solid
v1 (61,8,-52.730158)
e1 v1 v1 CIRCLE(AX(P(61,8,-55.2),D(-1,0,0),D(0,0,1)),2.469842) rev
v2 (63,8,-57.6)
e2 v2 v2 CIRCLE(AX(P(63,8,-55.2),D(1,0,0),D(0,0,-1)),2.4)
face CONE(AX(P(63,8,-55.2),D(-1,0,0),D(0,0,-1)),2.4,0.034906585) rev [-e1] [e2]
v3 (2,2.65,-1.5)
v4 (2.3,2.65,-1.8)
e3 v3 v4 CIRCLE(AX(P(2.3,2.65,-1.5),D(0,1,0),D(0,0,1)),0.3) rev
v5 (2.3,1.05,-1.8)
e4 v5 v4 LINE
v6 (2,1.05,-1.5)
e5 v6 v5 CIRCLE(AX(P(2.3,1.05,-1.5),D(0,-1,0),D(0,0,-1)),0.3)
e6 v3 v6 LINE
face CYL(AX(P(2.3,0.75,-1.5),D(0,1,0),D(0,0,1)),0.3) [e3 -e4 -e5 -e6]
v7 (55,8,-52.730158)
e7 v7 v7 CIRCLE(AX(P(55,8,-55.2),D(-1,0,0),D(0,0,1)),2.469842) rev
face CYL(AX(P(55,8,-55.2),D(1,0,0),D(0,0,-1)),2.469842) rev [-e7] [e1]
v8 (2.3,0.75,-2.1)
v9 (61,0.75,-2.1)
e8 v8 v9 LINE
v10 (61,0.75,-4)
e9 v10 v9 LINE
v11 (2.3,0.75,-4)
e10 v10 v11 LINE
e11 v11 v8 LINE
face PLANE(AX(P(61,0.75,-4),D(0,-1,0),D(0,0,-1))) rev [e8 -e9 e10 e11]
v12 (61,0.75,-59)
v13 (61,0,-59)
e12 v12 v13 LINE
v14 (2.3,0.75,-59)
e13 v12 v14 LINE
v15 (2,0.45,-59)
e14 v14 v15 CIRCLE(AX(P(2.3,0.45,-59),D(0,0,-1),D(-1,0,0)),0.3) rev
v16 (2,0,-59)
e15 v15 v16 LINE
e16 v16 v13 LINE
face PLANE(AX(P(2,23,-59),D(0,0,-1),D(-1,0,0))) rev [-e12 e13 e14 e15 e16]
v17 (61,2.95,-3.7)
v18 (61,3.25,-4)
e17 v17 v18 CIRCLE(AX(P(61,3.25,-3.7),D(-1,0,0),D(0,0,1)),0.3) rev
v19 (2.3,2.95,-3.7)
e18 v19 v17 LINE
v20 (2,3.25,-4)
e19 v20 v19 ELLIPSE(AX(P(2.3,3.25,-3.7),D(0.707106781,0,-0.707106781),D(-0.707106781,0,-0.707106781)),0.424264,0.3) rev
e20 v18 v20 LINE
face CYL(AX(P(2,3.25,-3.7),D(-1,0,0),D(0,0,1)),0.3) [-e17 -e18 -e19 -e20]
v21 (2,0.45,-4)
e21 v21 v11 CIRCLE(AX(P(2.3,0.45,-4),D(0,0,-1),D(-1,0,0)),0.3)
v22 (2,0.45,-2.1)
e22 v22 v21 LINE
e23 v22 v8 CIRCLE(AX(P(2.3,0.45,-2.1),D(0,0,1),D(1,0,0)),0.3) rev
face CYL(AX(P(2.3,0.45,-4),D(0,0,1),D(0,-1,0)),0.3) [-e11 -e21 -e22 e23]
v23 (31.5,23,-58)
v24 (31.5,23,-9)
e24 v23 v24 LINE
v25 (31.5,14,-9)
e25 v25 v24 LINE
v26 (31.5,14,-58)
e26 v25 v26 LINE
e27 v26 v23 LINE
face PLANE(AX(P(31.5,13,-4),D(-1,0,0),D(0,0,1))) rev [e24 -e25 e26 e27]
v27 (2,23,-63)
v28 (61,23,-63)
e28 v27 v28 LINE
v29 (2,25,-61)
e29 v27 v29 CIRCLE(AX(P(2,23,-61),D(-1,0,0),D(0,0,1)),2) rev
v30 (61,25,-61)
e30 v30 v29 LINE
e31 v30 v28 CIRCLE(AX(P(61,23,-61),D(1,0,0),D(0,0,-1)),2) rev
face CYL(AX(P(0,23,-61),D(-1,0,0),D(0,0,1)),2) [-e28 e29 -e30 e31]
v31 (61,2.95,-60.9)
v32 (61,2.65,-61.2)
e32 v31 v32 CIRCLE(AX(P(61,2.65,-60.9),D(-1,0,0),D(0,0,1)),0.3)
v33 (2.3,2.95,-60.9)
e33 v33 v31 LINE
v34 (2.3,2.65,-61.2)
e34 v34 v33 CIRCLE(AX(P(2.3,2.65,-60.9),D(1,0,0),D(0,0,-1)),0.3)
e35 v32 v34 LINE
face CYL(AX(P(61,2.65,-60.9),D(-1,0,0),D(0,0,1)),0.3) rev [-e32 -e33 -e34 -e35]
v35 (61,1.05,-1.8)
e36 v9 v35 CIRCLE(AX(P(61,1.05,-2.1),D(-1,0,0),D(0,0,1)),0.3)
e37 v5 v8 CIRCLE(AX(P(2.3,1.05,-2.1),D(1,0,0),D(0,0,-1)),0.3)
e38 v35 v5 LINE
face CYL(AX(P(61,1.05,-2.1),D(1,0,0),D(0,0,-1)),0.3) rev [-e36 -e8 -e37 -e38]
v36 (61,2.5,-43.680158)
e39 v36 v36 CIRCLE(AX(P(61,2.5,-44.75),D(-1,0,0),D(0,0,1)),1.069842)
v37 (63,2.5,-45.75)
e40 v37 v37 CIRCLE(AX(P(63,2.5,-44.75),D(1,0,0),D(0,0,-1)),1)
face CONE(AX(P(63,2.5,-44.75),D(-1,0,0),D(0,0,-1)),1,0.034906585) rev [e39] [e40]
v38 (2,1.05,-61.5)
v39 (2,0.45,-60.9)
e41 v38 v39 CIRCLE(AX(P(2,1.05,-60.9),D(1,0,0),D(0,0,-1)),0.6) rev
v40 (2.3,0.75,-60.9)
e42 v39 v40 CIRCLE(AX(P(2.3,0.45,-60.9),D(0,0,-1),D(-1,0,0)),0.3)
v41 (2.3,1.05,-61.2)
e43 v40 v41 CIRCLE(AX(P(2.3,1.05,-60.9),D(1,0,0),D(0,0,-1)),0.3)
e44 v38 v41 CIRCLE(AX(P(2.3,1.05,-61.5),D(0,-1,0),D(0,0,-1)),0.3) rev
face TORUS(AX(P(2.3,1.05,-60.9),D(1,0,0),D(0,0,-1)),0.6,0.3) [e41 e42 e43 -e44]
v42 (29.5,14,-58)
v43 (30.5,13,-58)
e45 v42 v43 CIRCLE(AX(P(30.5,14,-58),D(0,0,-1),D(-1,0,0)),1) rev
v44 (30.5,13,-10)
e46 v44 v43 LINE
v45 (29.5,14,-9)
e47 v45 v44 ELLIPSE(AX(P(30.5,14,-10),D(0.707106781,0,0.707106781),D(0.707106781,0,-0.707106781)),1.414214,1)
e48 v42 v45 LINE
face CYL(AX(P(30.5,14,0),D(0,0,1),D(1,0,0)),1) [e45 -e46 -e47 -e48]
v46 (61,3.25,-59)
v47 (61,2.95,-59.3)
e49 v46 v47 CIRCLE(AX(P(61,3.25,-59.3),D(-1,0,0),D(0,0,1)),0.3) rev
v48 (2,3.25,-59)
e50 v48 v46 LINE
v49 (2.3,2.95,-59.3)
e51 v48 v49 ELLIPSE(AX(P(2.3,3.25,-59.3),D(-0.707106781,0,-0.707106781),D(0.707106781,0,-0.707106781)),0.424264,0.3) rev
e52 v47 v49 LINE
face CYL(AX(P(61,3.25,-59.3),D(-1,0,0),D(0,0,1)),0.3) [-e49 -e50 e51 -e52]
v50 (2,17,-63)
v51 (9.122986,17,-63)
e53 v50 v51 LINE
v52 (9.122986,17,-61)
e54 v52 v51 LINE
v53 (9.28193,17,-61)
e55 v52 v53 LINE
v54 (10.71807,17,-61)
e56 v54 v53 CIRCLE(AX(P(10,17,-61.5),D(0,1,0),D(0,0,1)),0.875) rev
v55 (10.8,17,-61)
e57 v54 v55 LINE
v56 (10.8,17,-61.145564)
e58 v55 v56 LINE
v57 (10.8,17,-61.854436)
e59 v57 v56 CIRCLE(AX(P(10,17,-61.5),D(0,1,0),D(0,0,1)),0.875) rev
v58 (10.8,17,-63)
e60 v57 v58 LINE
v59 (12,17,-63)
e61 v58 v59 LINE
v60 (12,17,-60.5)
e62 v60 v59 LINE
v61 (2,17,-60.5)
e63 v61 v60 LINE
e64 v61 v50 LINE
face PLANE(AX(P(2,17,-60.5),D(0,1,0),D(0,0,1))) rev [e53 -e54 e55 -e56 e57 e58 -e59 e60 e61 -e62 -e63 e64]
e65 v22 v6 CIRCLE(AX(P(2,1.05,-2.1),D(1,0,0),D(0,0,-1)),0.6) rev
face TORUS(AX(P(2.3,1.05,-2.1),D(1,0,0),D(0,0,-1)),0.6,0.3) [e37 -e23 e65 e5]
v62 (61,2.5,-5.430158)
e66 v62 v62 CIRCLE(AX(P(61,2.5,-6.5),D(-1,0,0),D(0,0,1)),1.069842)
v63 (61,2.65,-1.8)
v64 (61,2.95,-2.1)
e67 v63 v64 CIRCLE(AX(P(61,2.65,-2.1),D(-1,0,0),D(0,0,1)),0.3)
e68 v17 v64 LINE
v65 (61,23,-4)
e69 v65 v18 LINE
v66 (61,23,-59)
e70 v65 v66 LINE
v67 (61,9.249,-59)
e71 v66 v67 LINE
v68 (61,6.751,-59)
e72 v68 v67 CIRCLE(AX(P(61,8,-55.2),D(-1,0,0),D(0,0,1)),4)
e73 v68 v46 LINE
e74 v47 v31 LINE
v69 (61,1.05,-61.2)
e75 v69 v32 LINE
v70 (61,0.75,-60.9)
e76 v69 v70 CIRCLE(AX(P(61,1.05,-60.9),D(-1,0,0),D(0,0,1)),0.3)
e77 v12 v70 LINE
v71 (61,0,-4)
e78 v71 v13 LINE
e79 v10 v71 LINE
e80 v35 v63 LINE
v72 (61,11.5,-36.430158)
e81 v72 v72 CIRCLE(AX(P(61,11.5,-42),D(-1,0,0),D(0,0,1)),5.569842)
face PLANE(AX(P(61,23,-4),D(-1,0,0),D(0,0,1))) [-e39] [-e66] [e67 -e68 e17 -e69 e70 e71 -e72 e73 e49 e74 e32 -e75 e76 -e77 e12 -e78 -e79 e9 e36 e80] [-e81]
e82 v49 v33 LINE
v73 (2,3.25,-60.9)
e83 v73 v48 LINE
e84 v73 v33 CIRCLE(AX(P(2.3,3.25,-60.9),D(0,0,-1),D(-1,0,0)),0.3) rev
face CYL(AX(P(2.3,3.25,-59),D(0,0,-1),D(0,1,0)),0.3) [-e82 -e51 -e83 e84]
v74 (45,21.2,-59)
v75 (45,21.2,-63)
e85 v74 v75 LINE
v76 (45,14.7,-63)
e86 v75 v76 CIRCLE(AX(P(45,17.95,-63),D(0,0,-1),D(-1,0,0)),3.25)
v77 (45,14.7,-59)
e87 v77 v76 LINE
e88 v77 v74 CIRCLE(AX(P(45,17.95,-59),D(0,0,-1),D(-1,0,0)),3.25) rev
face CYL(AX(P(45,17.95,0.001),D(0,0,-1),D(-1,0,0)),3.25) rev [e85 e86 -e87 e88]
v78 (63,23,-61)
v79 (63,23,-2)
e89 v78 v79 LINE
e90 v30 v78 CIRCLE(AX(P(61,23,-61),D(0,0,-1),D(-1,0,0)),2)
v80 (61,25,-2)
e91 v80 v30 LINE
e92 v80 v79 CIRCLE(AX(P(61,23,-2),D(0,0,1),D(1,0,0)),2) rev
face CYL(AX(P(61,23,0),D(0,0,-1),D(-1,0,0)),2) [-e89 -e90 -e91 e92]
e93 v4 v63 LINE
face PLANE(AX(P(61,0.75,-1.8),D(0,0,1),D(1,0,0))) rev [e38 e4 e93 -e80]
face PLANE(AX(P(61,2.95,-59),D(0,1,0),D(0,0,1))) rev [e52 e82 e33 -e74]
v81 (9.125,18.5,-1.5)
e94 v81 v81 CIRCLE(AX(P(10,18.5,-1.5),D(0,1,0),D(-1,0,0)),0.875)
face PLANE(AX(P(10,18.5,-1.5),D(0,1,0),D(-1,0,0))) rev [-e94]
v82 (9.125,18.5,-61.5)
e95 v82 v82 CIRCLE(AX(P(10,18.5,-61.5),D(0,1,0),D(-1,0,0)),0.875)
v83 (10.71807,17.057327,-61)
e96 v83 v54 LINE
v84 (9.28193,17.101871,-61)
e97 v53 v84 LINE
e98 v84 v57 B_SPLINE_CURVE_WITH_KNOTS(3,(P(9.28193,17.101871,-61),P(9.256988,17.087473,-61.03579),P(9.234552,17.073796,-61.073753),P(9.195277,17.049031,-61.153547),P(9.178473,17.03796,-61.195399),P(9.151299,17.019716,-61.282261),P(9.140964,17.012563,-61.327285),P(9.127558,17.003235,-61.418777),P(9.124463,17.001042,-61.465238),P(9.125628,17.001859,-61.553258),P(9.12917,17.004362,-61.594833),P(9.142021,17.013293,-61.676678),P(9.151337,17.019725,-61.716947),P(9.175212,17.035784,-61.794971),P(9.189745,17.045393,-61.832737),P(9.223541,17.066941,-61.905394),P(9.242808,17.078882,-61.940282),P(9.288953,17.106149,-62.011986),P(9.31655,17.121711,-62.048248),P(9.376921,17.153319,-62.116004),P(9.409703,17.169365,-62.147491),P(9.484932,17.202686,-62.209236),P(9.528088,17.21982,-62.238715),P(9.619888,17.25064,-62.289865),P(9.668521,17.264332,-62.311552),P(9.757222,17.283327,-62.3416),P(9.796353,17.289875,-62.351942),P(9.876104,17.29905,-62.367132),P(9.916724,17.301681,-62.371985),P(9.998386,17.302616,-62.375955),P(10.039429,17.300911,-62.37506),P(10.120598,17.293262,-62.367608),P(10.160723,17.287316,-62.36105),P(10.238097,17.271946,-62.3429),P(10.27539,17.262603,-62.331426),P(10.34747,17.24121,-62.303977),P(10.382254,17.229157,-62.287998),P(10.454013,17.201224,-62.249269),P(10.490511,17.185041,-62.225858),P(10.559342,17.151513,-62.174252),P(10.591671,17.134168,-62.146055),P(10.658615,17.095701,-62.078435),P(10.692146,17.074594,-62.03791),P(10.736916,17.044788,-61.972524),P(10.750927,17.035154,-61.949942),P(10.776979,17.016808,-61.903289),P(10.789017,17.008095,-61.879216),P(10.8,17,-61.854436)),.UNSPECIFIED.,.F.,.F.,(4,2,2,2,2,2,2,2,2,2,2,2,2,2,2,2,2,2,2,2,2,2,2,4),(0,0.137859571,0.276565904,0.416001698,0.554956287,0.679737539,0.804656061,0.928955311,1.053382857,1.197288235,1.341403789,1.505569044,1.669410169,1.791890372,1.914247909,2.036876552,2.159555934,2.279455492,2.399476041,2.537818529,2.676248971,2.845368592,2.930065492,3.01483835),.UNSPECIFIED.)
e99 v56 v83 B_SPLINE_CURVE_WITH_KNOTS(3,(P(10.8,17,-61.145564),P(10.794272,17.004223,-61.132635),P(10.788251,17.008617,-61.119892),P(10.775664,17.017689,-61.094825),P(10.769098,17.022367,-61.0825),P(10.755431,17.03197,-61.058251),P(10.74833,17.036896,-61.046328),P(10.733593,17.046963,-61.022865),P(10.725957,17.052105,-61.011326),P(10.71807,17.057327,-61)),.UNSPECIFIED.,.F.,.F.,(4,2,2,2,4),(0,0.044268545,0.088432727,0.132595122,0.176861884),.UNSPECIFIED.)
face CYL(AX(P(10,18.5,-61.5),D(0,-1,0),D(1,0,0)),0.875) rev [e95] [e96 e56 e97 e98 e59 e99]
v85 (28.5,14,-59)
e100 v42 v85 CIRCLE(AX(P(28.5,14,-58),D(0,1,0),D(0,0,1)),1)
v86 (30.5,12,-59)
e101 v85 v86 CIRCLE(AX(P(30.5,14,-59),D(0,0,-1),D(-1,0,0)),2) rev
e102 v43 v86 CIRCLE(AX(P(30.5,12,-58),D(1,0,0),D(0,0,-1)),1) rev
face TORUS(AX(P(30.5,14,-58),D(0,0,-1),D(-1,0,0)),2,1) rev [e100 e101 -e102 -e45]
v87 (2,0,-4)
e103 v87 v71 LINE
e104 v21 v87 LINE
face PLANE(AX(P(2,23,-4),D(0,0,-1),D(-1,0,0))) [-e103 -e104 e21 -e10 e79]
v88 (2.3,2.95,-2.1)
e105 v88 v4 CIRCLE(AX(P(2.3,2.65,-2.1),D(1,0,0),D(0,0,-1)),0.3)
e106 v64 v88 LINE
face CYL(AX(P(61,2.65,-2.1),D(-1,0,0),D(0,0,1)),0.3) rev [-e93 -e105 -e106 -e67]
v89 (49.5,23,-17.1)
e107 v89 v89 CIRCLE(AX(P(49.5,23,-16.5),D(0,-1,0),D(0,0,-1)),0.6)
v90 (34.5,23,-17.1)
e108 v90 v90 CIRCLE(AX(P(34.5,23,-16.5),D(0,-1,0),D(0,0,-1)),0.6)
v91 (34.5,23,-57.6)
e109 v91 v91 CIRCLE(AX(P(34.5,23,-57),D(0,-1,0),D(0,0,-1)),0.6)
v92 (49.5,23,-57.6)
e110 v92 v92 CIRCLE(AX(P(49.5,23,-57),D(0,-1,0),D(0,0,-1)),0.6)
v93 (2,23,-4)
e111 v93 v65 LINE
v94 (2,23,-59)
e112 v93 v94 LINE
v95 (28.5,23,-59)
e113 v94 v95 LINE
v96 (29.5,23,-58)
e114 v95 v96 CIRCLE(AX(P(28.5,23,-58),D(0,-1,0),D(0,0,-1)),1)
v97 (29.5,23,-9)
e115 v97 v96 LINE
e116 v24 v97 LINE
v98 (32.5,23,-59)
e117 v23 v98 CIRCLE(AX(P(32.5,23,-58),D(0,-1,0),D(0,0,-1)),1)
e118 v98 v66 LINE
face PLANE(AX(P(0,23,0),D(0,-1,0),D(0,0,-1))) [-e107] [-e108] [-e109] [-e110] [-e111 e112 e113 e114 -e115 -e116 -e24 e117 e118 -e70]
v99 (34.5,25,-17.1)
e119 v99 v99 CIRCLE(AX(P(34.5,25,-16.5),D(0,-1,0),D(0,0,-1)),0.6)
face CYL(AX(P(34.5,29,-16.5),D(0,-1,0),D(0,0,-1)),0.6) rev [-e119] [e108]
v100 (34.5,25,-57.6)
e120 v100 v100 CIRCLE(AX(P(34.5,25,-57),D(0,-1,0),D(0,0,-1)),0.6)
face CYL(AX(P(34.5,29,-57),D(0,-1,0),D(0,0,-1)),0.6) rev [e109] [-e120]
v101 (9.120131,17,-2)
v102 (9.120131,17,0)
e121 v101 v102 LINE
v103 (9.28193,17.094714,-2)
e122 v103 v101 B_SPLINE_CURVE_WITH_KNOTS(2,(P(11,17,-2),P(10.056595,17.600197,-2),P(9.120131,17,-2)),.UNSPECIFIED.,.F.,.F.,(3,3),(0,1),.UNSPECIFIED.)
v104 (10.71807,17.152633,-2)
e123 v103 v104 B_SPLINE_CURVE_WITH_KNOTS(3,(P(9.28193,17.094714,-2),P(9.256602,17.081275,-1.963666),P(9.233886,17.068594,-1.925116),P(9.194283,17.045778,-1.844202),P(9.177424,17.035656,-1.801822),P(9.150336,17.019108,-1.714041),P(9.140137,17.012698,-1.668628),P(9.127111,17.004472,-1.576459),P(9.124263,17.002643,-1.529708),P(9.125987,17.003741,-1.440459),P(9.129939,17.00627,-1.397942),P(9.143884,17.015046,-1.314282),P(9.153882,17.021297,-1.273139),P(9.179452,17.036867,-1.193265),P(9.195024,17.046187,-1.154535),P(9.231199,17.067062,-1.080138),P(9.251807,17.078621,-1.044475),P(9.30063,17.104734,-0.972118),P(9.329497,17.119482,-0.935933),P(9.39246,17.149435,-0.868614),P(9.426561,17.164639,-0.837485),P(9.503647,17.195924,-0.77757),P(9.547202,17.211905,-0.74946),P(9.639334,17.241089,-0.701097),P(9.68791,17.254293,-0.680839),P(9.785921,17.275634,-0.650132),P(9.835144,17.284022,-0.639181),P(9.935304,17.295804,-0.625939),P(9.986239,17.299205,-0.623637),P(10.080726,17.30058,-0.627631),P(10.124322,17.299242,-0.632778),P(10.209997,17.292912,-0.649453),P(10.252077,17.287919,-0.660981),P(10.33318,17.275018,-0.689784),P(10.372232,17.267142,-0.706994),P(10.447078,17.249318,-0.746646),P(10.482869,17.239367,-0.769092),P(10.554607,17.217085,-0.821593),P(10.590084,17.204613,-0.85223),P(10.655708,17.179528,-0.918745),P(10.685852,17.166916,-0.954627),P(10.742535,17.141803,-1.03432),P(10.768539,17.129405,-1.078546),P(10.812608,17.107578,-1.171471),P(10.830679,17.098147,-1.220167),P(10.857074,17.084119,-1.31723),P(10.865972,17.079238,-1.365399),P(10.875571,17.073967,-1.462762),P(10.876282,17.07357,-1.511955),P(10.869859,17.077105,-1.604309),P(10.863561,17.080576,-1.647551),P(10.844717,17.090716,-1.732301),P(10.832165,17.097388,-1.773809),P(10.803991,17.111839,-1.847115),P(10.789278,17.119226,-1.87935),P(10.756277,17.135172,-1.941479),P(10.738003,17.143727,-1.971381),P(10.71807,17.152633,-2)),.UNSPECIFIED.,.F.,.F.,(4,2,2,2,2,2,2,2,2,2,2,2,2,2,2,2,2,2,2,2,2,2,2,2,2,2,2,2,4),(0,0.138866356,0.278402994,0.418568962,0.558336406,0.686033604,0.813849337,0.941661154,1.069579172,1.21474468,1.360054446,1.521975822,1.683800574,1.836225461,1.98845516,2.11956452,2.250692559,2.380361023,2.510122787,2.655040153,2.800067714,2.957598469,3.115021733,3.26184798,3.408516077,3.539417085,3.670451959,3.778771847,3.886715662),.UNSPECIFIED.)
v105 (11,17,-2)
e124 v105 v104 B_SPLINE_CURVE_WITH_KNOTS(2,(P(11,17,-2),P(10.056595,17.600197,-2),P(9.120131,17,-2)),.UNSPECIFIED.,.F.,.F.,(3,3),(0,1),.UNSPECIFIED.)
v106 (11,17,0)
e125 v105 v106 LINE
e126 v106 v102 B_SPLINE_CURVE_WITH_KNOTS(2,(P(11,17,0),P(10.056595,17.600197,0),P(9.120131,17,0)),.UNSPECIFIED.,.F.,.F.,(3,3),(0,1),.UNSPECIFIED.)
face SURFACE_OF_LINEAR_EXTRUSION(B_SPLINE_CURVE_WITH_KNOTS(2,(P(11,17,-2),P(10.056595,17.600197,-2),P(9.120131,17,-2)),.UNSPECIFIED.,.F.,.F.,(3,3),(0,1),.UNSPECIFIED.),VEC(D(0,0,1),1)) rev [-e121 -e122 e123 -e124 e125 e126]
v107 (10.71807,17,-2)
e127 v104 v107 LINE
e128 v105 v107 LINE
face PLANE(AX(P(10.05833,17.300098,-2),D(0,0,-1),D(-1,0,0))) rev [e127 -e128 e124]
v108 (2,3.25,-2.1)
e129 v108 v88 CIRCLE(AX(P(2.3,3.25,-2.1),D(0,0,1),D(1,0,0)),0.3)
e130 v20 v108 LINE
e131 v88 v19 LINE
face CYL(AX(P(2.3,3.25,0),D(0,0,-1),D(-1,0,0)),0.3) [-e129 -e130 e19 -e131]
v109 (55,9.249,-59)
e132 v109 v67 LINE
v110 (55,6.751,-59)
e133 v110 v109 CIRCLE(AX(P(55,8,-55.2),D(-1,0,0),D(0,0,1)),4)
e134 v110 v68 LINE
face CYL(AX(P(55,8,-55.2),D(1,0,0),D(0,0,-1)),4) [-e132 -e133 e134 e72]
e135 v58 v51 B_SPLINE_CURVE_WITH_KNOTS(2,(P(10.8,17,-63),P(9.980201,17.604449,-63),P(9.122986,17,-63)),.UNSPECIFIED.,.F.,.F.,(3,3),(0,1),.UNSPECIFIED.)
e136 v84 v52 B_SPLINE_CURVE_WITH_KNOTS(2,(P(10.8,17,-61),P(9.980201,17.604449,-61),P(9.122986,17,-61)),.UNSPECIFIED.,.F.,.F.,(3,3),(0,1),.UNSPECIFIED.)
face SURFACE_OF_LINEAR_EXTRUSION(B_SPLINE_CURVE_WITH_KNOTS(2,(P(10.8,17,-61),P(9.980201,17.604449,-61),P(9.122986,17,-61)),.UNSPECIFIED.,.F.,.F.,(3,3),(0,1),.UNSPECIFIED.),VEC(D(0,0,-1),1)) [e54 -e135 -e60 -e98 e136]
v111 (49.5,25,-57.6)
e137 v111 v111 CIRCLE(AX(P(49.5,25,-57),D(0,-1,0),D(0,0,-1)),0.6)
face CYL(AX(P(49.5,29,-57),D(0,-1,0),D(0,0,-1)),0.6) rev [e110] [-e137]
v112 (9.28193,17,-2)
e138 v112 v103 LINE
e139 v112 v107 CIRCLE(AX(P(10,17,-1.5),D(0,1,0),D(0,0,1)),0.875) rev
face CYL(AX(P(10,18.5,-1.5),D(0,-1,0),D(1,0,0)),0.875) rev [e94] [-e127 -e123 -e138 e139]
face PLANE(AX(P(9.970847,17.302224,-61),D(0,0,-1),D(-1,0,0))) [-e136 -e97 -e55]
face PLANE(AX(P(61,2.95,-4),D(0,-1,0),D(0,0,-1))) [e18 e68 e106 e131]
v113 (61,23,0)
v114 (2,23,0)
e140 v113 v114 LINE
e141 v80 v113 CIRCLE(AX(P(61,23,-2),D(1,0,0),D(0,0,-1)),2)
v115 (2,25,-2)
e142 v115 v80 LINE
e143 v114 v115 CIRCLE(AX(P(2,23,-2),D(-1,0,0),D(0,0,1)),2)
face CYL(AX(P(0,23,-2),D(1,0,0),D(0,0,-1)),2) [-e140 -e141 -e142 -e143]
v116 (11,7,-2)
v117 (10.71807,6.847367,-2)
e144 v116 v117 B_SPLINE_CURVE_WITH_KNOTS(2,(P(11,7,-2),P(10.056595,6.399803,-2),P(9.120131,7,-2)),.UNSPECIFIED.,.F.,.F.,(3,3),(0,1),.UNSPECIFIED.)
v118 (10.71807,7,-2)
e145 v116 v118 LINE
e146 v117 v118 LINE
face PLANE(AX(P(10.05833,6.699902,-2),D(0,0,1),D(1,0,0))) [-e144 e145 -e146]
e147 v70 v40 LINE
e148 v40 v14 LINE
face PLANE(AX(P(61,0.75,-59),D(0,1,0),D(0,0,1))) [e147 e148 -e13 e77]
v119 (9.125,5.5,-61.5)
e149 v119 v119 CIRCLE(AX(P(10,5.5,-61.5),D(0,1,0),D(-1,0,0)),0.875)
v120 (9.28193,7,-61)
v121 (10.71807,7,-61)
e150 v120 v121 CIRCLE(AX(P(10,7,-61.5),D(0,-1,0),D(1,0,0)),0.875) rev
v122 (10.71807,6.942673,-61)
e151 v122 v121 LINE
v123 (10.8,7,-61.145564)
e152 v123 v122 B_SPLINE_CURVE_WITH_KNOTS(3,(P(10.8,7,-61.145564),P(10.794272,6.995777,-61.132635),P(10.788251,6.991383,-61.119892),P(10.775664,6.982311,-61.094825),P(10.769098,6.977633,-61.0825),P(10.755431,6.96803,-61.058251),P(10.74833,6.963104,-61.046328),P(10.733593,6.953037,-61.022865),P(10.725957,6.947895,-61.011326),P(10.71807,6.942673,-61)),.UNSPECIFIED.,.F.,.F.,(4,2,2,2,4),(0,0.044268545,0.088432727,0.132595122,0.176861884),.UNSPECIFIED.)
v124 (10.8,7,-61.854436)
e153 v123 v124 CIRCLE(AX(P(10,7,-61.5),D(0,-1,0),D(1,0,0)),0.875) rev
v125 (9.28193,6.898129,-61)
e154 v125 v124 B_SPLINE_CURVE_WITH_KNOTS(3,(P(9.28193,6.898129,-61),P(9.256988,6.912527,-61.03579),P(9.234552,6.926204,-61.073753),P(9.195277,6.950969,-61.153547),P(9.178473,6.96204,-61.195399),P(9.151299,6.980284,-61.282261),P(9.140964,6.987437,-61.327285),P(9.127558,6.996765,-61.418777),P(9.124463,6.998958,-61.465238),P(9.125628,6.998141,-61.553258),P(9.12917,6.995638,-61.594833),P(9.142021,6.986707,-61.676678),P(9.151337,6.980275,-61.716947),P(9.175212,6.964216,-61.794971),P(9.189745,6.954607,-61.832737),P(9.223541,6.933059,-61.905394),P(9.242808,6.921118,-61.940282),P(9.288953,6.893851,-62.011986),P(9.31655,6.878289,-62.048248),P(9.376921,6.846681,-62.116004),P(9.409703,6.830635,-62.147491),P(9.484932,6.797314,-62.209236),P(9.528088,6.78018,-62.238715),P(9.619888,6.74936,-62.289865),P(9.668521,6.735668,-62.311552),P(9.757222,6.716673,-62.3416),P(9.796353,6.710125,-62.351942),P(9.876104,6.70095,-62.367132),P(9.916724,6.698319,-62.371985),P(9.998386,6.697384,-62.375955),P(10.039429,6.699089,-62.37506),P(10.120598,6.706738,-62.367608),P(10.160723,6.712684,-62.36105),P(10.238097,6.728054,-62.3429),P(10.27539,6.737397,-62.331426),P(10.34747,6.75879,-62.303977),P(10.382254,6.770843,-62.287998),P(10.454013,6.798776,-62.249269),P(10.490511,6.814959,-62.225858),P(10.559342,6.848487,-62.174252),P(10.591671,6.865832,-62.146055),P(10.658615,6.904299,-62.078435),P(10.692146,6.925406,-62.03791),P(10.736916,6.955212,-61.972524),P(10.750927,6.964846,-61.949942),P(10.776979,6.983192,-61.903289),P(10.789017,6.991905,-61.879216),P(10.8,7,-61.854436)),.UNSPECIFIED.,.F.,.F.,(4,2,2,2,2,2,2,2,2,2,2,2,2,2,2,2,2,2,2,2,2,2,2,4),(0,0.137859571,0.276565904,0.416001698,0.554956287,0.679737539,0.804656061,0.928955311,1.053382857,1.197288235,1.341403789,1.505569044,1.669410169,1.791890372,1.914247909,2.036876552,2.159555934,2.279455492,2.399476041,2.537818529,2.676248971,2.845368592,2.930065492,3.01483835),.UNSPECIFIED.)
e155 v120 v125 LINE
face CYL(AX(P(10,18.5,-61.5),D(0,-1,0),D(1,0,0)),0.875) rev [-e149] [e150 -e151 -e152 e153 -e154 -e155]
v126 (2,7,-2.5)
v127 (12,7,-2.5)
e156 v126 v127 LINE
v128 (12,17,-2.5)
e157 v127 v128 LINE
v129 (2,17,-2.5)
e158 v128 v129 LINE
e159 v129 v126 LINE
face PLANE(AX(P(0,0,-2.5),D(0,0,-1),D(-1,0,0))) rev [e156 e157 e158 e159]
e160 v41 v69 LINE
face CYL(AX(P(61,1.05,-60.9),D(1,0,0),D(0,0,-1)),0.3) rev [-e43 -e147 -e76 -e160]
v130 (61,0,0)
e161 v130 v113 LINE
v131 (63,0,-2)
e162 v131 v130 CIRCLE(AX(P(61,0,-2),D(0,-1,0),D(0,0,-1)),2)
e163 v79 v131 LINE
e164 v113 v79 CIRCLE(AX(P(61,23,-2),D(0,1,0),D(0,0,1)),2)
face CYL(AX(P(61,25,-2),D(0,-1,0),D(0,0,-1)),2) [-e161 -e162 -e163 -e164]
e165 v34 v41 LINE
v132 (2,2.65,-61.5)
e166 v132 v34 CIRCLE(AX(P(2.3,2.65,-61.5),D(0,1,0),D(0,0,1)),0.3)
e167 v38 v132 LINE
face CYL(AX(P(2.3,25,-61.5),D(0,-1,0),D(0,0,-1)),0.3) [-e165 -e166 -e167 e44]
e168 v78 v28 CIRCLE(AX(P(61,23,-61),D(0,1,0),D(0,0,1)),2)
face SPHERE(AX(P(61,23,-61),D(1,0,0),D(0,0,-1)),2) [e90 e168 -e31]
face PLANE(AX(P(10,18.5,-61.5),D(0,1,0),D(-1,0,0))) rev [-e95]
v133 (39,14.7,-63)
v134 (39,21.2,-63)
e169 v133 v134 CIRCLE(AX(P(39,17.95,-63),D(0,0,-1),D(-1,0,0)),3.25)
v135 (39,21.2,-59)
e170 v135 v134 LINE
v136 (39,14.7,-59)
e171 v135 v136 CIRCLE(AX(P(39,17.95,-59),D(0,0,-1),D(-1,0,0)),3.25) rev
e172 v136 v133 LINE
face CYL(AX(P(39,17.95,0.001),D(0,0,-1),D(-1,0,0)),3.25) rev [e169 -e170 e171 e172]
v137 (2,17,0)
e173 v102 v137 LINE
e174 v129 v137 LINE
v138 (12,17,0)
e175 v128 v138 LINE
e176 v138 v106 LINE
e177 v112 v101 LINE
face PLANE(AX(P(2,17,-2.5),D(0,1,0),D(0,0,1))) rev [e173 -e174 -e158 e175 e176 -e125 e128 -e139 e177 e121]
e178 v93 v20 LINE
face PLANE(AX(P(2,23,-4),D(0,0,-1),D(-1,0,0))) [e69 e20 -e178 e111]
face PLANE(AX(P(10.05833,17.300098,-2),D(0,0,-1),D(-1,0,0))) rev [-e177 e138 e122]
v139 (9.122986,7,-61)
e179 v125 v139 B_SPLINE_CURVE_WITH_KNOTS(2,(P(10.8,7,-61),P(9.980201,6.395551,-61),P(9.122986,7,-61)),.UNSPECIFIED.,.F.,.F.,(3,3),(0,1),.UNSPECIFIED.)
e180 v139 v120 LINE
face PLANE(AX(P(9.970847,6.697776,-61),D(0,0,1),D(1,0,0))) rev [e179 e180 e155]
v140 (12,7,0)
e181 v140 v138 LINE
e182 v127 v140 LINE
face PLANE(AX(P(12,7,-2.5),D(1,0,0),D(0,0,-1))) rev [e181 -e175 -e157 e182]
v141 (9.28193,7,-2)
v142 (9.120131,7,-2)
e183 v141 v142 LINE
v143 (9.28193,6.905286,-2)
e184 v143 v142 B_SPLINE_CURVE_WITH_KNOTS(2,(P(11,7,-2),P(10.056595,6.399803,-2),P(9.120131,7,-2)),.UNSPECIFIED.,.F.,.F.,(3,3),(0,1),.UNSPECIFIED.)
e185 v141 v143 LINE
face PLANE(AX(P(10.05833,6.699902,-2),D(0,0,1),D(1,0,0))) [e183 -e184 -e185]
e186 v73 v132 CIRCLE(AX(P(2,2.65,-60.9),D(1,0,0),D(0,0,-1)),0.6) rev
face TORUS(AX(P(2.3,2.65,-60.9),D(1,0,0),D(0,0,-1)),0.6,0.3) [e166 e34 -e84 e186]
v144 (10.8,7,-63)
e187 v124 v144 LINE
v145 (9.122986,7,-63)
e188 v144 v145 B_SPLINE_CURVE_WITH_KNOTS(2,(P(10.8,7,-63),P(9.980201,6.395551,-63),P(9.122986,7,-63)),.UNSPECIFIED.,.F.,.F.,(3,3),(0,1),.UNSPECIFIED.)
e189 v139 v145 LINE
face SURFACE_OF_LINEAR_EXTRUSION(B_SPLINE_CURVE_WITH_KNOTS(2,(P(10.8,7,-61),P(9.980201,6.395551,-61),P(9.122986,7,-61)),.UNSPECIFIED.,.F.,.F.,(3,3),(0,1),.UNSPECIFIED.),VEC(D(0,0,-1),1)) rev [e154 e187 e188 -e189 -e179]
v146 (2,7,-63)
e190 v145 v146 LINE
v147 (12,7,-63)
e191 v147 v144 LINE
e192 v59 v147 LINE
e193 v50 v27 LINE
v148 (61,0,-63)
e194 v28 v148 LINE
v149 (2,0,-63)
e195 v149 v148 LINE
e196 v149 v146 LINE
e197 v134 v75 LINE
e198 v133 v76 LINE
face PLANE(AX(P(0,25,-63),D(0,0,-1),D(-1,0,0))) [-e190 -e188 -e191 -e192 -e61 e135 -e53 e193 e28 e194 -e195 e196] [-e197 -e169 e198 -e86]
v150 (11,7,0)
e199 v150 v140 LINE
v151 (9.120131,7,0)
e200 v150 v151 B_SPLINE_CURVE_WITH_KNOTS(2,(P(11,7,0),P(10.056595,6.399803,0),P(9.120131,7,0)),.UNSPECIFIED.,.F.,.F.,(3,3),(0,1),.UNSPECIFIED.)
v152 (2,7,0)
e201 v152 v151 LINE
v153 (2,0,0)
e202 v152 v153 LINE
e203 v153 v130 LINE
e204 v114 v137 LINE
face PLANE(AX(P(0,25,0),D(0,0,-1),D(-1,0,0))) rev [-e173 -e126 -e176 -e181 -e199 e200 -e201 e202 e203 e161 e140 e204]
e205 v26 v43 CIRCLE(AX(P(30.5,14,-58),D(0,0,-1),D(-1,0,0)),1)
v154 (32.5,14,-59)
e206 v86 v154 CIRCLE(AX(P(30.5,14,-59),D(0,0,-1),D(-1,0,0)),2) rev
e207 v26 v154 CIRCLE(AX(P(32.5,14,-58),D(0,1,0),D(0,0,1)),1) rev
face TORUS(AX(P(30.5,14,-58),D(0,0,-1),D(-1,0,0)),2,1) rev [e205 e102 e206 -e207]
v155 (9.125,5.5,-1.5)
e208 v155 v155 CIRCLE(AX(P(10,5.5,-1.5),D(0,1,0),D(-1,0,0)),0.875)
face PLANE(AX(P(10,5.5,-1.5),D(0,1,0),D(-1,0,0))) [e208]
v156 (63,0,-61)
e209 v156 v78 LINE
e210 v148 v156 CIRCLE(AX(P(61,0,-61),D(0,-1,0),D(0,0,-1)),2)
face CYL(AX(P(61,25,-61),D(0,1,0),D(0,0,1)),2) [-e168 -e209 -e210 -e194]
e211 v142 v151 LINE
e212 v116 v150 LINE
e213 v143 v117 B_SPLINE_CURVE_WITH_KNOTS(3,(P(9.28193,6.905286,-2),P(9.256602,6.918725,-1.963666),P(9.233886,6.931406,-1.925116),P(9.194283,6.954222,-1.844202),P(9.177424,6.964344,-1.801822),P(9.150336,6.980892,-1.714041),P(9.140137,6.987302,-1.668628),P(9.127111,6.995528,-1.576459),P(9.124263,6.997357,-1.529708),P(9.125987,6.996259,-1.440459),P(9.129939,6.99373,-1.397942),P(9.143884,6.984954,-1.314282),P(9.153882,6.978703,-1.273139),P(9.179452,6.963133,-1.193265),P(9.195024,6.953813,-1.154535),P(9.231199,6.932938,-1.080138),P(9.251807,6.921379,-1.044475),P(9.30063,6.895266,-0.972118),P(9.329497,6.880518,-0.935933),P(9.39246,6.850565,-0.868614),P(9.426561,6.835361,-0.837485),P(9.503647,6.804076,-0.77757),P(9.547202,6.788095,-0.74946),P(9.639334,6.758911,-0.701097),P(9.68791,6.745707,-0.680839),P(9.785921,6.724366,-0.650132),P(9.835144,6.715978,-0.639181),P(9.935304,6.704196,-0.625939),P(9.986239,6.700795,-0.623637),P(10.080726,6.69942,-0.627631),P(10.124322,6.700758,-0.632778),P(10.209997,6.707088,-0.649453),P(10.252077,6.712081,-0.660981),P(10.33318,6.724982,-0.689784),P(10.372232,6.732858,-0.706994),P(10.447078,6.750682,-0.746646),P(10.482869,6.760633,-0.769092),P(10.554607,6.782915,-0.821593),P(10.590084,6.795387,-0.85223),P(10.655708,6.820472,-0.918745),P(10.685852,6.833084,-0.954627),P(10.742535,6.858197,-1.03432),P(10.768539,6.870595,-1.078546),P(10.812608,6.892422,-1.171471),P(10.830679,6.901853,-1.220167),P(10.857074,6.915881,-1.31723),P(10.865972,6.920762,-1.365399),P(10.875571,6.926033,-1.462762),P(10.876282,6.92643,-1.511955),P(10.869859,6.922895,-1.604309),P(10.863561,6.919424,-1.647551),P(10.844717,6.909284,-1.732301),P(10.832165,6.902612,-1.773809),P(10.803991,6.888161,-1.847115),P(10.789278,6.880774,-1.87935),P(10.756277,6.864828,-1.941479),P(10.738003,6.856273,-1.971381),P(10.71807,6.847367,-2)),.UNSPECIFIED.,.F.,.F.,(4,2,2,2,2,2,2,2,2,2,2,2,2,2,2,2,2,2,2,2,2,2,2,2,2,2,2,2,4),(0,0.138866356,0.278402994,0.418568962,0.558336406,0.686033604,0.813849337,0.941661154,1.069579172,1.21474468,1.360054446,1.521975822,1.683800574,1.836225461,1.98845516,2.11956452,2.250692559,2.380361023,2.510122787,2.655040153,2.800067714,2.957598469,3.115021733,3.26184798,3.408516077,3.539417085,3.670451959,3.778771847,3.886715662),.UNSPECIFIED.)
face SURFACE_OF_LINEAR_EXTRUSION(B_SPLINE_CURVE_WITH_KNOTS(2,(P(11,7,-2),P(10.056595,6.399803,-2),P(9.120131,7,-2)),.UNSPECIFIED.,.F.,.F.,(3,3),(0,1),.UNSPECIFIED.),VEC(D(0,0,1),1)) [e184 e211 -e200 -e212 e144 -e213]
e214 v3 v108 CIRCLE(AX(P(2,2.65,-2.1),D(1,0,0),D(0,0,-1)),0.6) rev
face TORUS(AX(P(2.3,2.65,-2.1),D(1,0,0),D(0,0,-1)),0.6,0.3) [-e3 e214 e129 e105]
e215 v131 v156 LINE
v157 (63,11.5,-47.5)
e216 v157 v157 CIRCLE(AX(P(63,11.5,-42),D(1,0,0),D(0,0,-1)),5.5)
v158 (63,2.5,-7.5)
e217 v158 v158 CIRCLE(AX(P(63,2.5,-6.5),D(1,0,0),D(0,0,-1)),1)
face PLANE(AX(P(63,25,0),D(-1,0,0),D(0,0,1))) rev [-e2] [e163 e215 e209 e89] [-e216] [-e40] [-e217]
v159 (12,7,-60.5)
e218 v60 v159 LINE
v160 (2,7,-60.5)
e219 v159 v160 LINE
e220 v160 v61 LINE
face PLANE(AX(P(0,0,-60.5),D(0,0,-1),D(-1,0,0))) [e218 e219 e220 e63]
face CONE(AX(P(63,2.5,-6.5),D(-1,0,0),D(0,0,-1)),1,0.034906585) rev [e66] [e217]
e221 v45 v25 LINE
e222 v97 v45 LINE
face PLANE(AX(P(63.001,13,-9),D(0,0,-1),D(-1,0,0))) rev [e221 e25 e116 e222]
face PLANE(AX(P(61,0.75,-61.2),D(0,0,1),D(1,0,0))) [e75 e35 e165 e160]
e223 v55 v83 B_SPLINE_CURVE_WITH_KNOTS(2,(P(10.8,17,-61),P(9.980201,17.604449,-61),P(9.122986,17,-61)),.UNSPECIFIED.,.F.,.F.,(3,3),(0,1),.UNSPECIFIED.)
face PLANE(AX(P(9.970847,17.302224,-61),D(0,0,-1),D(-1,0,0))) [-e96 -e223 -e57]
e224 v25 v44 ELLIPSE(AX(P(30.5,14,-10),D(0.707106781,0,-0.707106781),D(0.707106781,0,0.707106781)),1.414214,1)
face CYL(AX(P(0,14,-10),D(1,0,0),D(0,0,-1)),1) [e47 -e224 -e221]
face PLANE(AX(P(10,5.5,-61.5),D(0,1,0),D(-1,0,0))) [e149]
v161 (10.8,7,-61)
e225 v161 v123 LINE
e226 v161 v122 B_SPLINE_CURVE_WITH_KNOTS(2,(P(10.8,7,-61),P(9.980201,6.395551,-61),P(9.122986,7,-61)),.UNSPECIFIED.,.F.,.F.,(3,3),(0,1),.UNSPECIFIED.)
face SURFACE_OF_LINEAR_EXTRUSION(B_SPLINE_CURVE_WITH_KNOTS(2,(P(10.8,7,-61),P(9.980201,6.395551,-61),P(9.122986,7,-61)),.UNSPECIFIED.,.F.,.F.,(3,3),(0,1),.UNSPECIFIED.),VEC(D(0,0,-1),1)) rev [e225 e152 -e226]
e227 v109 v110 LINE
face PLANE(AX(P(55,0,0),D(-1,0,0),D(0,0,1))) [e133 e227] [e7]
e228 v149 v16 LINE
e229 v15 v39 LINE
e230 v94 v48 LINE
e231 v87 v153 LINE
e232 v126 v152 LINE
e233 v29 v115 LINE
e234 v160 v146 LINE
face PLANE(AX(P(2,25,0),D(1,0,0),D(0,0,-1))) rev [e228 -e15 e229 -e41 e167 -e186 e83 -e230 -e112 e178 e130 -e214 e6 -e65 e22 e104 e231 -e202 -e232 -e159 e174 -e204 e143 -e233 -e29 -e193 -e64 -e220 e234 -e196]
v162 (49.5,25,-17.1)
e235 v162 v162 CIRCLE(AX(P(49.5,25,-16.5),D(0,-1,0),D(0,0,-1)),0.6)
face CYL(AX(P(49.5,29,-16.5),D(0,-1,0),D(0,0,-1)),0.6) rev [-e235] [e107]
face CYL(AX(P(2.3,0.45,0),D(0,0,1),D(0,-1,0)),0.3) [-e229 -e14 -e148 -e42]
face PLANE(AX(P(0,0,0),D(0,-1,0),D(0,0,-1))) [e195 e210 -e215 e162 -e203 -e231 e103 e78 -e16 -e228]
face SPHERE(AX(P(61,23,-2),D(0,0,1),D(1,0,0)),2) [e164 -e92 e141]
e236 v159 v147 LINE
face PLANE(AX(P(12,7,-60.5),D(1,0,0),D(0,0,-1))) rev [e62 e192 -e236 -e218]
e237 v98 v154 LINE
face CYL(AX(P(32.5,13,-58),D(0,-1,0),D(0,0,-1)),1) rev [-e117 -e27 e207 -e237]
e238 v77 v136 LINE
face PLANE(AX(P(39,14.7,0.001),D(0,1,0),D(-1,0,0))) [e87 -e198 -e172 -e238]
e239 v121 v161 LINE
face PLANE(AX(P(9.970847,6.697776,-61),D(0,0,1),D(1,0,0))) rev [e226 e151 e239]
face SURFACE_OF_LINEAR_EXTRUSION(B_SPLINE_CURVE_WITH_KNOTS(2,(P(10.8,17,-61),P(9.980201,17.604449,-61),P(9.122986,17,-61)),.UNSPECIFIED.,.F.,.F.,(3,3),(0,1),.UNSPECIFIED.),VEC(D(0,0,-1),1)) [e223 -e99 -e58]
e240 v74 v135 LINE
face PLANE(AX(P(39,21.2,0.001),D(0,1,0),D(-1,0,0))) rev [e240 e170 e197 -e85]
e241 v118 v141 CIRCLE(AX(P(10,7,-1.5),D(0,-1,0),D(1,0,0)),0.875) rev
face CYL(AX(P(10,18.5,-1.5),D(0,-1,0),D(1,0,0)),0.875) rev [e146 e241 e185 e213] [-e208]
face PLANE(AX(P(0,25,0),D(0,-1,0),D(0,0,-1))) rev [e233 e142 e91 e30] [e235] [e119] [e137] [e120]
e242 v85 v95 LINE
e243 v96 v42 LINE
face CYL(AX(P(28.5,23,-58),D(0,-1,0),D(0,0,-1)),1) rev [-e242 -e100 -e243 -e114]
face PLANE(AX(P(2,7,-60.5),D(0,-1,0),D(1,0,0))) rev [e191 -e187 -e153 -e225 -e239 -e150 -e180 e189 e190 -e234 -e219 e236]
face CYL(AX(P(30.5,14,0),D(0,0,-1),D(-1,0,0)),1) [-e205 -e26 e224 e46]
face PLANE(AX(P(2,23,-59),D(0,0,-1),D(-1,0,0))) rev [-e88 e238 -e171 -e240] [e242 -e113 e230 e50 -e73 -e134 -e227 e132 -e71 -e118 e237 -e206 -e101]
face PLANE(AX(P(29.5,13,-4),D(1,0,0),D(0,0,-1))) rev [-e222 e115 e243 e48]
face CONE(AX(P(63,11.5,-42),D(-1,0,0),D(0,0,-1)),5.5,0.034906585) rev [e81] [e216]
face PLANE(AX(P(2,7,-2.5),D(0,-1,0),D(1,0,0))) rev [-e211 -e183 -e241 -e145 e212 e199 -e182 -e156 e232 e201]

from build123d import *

# Parameters (mm, degrees)
SKETCH1_W                     = 63
SKETCH1_H                     = 63
BOSS_EXTRUDE2_DEPTH           = 25
SKETCH1_4_W                   = 59
SKETCH1_4_H                   = 55
CUT_EXTRUDE1_DEPTH            = 23
SKETCH4_W                     = 2
SKETCH4_H                     = 55
BOSS_EXTRUDE3_DEPTH           = 10
FILLET1_R                     = 2
SKETCH5_W                     = 2
SKETCH5_H                     = 63
CUT_EXTRUDE3_DEPTH            = 93.536479293
SKETCH6_W                     = 2.2
SKETCH6_H                     = 2.2
CUT_EXTRUDE4_DEPTH            = 59
SKETCH7_W                     = 10
SKETCH7_H                     = 10
CUT_EXTRUDE5_DEPTH            = 2.5
CUT_EXTRUDE6_DEPTH            = 11.5
CUT_EXTRUDE6_DEPTH_BACK       = 1.5
SKETCH8_R                     = 0.875
SKETCH9_W                     = 10
SKETCH9_H                     = 10
CUT_EXTRUDE7_DEPTH            = 2.5
CUT_EXTRUDE8_DEPTH            = 11.5
CUT_EXTRUDE8_DEPTH_BACK       = 1.5
SKETCH10_R                    = 0.875
CUT_EXTRUDE9_DEPTH            = 2
CUT_EXTRUDE10_DEPTH           = 2
FILLET2_R                     = 0.3
CUT_EXTRUDE12_REACH           = 94.536
CUT_EXTRUDE13_REACH           = 77.606
SKETCH15_W                    = 5
SKETCH15_H                    = 10
FILLET3_R                     = 1
SKETCH18_R                    = 2.4
CUT_EXTRUDE16_DEPTH           = 10
CUT_EXTRUDE16_DRAFT           = 2
SKETCH18_R_2                  = 5.5
CUT_EXTRUDE16_PROFILE_2_DEPTH = 10
CUT_EXTRUDE16_PROFILE_2_DRAFT = 2
SKETCH18_R_3                  = 1
CUT_EXTRUDE16_PROFILE_3_DEPTH = 10
CUT_EXTRUDE16_PROFILE_3_DRAFT = 2
CUT_EXTRUDE16_PROFILE_4_DEPTH = 10
CUT_EXTRUDE16_PROFILE_4_DRAFT = 2
SKETCH19_R                    = 2.469841539
BOSS_EXTRUDE4_DEPTH           = 6
SKETCH13_R                    = 0.6
CUT_EXTRUDE17_DEPTH           = 6


with BuildPart() as part:
    # Sketch1 → Boss-Extrude2 (new body)
    with BuildSketch(Plane(origin=(0, 0, 0), x_dir=(1, 0, 0), z_dir=(0, 1, 0))):
        with Locations((31.5, 31.5)):
            Rectangle(SKETCH1_W, SKETCH1_H)
    extrude(amount=BOSS_EXTRUDE2_DEPTH)

    # Sketch1<4> → Cut-Extrude1 (cut)
    with BuildSketch(Plane(origin=(0, 0, 0), x_dir=(1, 0, 0), z_dir=(0, 1, 0))):
        with Locations((31.5, 31.5)):
            Rectangle(SKETCH1_4_W, SKETCH1_4_H)
    extrude(amount=CUT_EXTRUDE1_DEPTH, mode=Mode.SUBTRACT)

    # Sketch4 → Boss-Extrude3 (add)
    with BuildSketch(Plane.XZ.offset(-23)):
        with Locations((30.5, -31.5)):
            Rectangle(SKETCH4_W, SKETCH4_H)
    extrude(amount=BOSS_EXTRUDE3_DEPTH)

    # Fillet1
    fillet1_edges = [part.edges().sort_by_distance(p)[0] for p in [
        (63, 25, -31.5),
        (31.5, 25, 0),
        (0, 25, -31.5),
        (0, 12.5, 0),
        (63, 12.5, 0),
        (63, 12.5, -63),
        (0, 12.5, -63),
        (31.5, 25, -63),
    ]]
    fillet(fillet1_edges, radius=FILLET1_R)

    # Sketch5 → Cut-Extrude3 (cut, through all)
    with BuildSketch(Plane(origin=(0, 0, 0), x_dir=(-1, 0, 0), z_dir=(0, -1, 0))):
        with Locations((-1, 31.5)):
            Rectangle(SKETCH5_W, SKETCH5_H)
    extrude(amount=-CUT_EXTRUDE3_DEPTH, mode=Mode.SUBTRACT)

    # Sketch6 → Cut-Extrude4 (cut)
    with BuildSketch(Plane.ZY.offset(-2)):
        with Locations((-2.9, 1.85)):
            Rectangle(SKETCH6_W, SKETCH6_H)
        with Locations((-60.1, 1.85)):
            Rectangle(SKETCH6_W, SKETCH6_H)
    extrude(amount=-CUT_EXTRUDE4_DEPTH, mode=Mode.SUBTRACT)

    # Sketch7 → Cut-Extrude5 (cut)
    with BuildSketch(Plane(origin=(0, 0, -63), x_dir=(-1, 0, 0), z_dir=(0, 0, -1))):
        with Locations((-7, 12)):
            Rectangle(SKETCH7_W, SKETCH7_H)
    extrude(amount=-CUT_EXTRUDE5_DEPTH, mode=Mode.SUBTRACT)

    # Sketch8 → Cut-Extrude6 (cut, two sides: drawn at the far end of the back side and taken through both)
    with BuildSketch(Plane(origin=(0, 7, 0), x_dir=(1, 0, 0), z_dir=(0, 1, 0)).offset(-CUT_EXTRUDE6_DEPTH_BACK)):
        with Locations(Location((10, 61.5, 0), (0, 0, 270))):
            Circle(SKETCH8_R)
    extrude(amount=CUT_EXTRUDE6_DEPTH + CUT_EXTRUDE6_DEPTH_BACK, mode=Mode.SUBTRACT)

    # Sketch9 → Cut-Extrude7 (cut)
    with BuildSketch(Plane.XY):
        with Locations((7, 12)):
            Rectangle(SKETCH9_W, SKETCH9_H)
    extrude(amount=-CUT_EXTRUDE7_DEPTH, mode=Mode.SUBTRACT)

    # Sketch10 → Cut-Extrude8 (cut, two sides: drawn at the far end of the back side and taken through both)
    with BuildSketch(Plane(origin=(0, 7, 0), x_dir=(1, 0, 0), z_dir=(0, 1, 0)).offset(-CUT_EXTRUDE8_DEPTH_BACK)):
        with Locations((10, 1.5)):
            Circle(SKETCH10_R)
    extrude(amount=CUT_EXTRUDE8_DEPTH + CUT_EXTRUDE8_DEPTH_BACK, mode=Mode.SUBTRACT)

    # Sketch11 → Cut-Extrude9 (cut)
    with BuildSketch(Plane(origin=(0, 0, -63), x_dir=(-1, 0, 0), z_dir=(0, 0, -1))):
        with BuildLine():
            Line((-9.122986176, 7), (-10.8, 7))
            add(Edge.make_bspline(
                [(-10.8, 7), (-9.980201359, 6.395551325), (-9.122986176, 7)],
                knots=[0, 0, 0, 1, 1, 1], degree=2))
        make_face()
        with BuildLine():
            Line((-9.122986176, 17), (-10.8, 17))
            add(Edge.make_bspline(
                [(-10.8, 17), (-9.980201359, 17.604448675), (-9.122986176, 17)],
                knots=[0, 0, 0, 1, 1, 1], degree=2))
        make_face()
    extrude(amount=-CUT_EXTRUDE9_DEPTH, mode=Mode.SUBTRACT)

    # Sketch12 → Cut-Extrude10 (cut)
    with BuildSketch(Plane.XY):
        with BuildLine():
            Line((11, 7), (9.120131213, 7))
            add(Edge.make_bspline(
                [(11, 7), (10.05659536, 6.399803182), (9.120131213, 7)],
                knots=[0, 0, 0, 1, 1, 1], degree=2))
        make_face()
        with BuildLine():
            Line((11, 17), (9.120131213, 17))
            add(Edge.make_bspline(
                [(11, 17), (10.05659536, 17.600196818), (9.120131213, 17)],
                knots=[0, 0, 0, 1, 1, 1], degree=2))
        make_face()
    extrude(amount=-CUT_EXTRUDE10_DEPTH, mode=Mode.SUBTRACT)

    # Fillet2
    fillet2_edges = [part.edges().sort_by_distance(p)[0] for p in [
        (31.5, 2.95, -59),
        (2, 0.75, -60.1),
        (2, 1.85, -61.2),
        (31.5, 0.75, -61.2),
        (31.5, 2.95, -61.2),
        (2, 2.95, -60.1),
        (2, 2.95, -2.9),
        (31.5, 2.95, -4),
        (31.5, 2.95, -1.8),
        (31.5, 0.75, -1.8),
        (2, 0.75, -2.9),
        (2, 1.85, -1.8),
    ]]
    fillet(fillet2_edges, radius=FILLET2_R)

    # Sketch14 → Cut-Extrude12 (cut, up to next)
    with BuildSketch(Plane(origin=(0, 0, -63), x_dir=(-1, 0, 0), z_dir=(0, 0, -1)), mode=Mode.PRIVATE) as cut_extrude12_sk1:
        with BuildLine():
            Line((-39, 14.7), (-45, 14.7))
            ThreePointArc((-45, 14.7), (-48.25, 17.95), (-45, 21.2))
            Line((-45, 21.2), (-39, 21.2))
            ThreePointArc((-39, 21.2), (-35.75, 17.95), (-39, 14.7))
        make_face()
    cut_extrude12_tool1 = extrude(cut_extrude12_sk1.sketch, amount=-CUT_EXTRUDE12_REACH, mode=Mode.PRIVATE) & part.part
    add(cut_extrude12_tool1.solids().sort_by_distance((42, 17.95, -63))[0], mode=Mode.SUBTRACT)

    # Sketch15 → Cut-Extrude13 (cut, up to next)
    with BuildSketch(Plane.ZY.offset(-29.5), mode=Mode.PRIVATE) as cut_extrude13_sk1:
        with Locations((-6.5, 18)):
            Rectangle(SKETCH15_W, SKETCH15_H)
    cut_extrude13_tool1 = extrude(cut_extrude13_sk1.sketch, amount=-CUT_EXTRUDE13_REACH, mode=Mode.PRIVATE) & part.part
    add(cut_extrude13_tool1.solids().sort_by_distance((29.5, 18, -6.5))[0], mode=Mode.SUBTRACT)

    # Fillet3
    fillet3_edges = [part.edges().sort_by_distance(p)[0] for p in [
        (29.5, 13, -34),
        (30.5, 13, -9),
        (29.5, 18, -59),
        (31.5, 18, -59),
        (30.5, 13, -59),
        (31.5, 13, -34),
    ]]
    fillet(fillet3_edges, radius=FILLET3_R - 0.0001)  # a hair under: the kernel refuses the full size


with BuildPart() as cut_extrude16_tool:
    # Sketch18 → Cut-Extrude16 (with draft: the straight prism first)
    with BuildSketch(Plane(origin=(63, 0, 0), x_dir=(0, 0, -1), z_dir=(1, 0, 0))):
        with Locations((55.2, 8)):
            Circle(SKETCH18_R)
    extrude(amount=-CUT_EXTRUDE16_DEPTH)
    # Cut-Extrude16: the draft: its side faces are tilted about the plane it starts from
    cut_extrude16_sides = [cut_extrude16_tool.faces().sort_by_distance(p)[0] for p in [
        (58, 8, -52.8),
    ]]
    draft(cut_extrude16_sides, Plane(origin=(63, 0, 0), x_dir=(0, 0, -1), z_dir=(1, 0, 0)), CUT_EXTRUDE16_DRAFT)


with BuildPart() as part_1:
    add(part.part)

    # Cut-Extrude16: cut by cut_extrude16_tool
    add(cut_extrude16_tool.part, mode=Mode.SUBTRACT)


with BuildPart() as cut_extrude16_profile_2_tool:
    # Sketch18 → Cut-Extrude16 profile 2 (with draft: the straight prism first)
    with BuildSketch(Plane(origin=(63, 0, 0), x_dir=(0, 0, -1), z_dir=(1, 0, 0))):
        with Locations((42, 11.5)):
            Circle(SKETCH18_R_2)
    extrude(amount=-CUT_EXTRUDE16_PROFILE_2_DEPTH)
    # Cut-Extrude16 profile 2: the draft: its side faces are tilted about the plane it starts from
    cut_extrude16_profile_2_sides = [cut_extrude16_profile_2_tool.faces().sort_by_distance(p)[0] for p in [
        (58, 11.5, -36.5),
    ]]
    draft(cut_extrude16_profile_2_sides, Plane(origin=(63, 0, 0), x_dir=(0, 0, -1), z_dir=(1, 0, 0)), CUT_EXTRUDE16_PROFILE_2_DRAFT)


with BuildPart() as part_2:
    add(part_1.part)

    # Cut-Extrude16 profile 2: cut by cut_extrude16_profile_2_tool
    add(cut_extrude16_profile_2_tool.part, mode=Mode.SUBTRACT)


with BuildPart() as cut_extrude16_profile_3_tool:
    # Sketch18 → Cut-Extrude16 profile 3 (with draft: the straight prism first)
    with BuildSketch(Plane(origin=(63, 0, 0), x_dir=(0, 0, -1), z_dir=(1, 0, 0))):
        with Locations((44.75, 2.5)):
            Circle(SKETCH18_R_3)
    extrude(amount=-CUT_EXTRUDE16_PROFILE_3_DEPTH)
    # Cut-Extrude16 profile 3: the draft: its side faces are tilted about the plane it starts from
    cut_extrude16_profile_3_sides = [cut_extrude16_profile_3_tool.faces().sort_by_distance(p)[0] for p in [
        (58, 2.5, -43.75),
    ]]
    draft(cut_extrude16_profile_3_sides, Plane(origin=(63, 0, 0), x_dir=(0, 0, -1), z_dir=(1, 0, 0)), CUT_EXTRUDE16_PROFILE_3_DRAFT)


with BuildPart() as part_3:
    add(part_2.part)

    # Cut-Extrude16 profile 3: cut by cut_extrude16_profile_3_tool
    add(cut_extrude16_profile_3_tool.part, mode=Mode.SUBTRACT)


with BuildPart() as cut_extrude16_profile_4_tool:
    # Sketch18 → Cut-Extrude16 profile 4 (with draft: the straight prism first)
    with BuildSketch(Plane(origin=(63, 0, 0), x_dir=(0, 0, -1), z_dir=(1, 0, 0))):
        with Locations((6.5, 2.5)):
            Circle(SKETCH18_R_3)
    extrude(amount=-CUT_EXTRUDE16_PROFILE_4_DEPTH)
    # Cut-Extrude16 profile 4: the draft: its side faces are tilted about the plane it starts from
    cut_extrude16_profile_4_sides = [cut_extrude16_profile_4_tool.faces().sort_by_distance(p)[0] for p in [
        (58, 2.5, -5.5),
    ]]
    draft(cut_extrude16_profile_4_sides, Plane(origin=(63, 0, 0), x_dir=(0, 0, -1), z_dir=(1, 0, 0)), CUT_EXTRUDE16_PROFILE_4_DRAFT)


with BuildPart() as part_4:
    add(part_3.part)

    # Cut-Extrude16 profile 4: cut by cut_extrude16_profile_4_tool
    add(cut_extrude16_profile_4_tool.part, mode=Mode.SUBTRACT)

    # Sketch19 → Boss-Extrude4 (add)
    with BuildSketch(Plane.ZY.offset(-61)):
        with BuildLine():
            ThreePointArc((-59, 6.7510004), (-54.567544468, 4.050316468), (-51.2, 8))
            ThreePointArc((-51.2, 8), (-54.567544468, 11.949683532), (-59, 9.2489996))
            Line((-59, 9.2489996), (-59, 6.7510004))
        make_face()
        with Locations((-55.2, 8)):
            Circle(SKETCH19_R, mode=Mode.SUBTRACT)
    extrude(amount=BOSS_EXTRUDE4_DEPTH)

    # Sketch13 → Cut-Extrude17 (cut)
    with BuildSketch(Plane(origin=(0, 23, 0), x_dir=(-1, 0, 0), z_dir=(0, -1, 0))):
        with Locations(Location((-34.5, 57, 0), (0, 0, 90))):
            Circle(SKETCH13_R)
        with Locations(Location((-49.5, 57, 0), (0, 0, 90))):
            Circle(SKETCH13_R)
        with Locations(Location((-49.5, 16.5, 0), (0, 0, 90))):
            Circle(SKETCH13_R)
        with Locations(Location((-34.5, 16.5, 0), (0, 0, 90))):
            Circle(SKETCH13_R)
    extrude(amount=-CUT_EXTRUDE17_DEPTH, mode=Mode.SUBTRACT)


solid = part_4.part
